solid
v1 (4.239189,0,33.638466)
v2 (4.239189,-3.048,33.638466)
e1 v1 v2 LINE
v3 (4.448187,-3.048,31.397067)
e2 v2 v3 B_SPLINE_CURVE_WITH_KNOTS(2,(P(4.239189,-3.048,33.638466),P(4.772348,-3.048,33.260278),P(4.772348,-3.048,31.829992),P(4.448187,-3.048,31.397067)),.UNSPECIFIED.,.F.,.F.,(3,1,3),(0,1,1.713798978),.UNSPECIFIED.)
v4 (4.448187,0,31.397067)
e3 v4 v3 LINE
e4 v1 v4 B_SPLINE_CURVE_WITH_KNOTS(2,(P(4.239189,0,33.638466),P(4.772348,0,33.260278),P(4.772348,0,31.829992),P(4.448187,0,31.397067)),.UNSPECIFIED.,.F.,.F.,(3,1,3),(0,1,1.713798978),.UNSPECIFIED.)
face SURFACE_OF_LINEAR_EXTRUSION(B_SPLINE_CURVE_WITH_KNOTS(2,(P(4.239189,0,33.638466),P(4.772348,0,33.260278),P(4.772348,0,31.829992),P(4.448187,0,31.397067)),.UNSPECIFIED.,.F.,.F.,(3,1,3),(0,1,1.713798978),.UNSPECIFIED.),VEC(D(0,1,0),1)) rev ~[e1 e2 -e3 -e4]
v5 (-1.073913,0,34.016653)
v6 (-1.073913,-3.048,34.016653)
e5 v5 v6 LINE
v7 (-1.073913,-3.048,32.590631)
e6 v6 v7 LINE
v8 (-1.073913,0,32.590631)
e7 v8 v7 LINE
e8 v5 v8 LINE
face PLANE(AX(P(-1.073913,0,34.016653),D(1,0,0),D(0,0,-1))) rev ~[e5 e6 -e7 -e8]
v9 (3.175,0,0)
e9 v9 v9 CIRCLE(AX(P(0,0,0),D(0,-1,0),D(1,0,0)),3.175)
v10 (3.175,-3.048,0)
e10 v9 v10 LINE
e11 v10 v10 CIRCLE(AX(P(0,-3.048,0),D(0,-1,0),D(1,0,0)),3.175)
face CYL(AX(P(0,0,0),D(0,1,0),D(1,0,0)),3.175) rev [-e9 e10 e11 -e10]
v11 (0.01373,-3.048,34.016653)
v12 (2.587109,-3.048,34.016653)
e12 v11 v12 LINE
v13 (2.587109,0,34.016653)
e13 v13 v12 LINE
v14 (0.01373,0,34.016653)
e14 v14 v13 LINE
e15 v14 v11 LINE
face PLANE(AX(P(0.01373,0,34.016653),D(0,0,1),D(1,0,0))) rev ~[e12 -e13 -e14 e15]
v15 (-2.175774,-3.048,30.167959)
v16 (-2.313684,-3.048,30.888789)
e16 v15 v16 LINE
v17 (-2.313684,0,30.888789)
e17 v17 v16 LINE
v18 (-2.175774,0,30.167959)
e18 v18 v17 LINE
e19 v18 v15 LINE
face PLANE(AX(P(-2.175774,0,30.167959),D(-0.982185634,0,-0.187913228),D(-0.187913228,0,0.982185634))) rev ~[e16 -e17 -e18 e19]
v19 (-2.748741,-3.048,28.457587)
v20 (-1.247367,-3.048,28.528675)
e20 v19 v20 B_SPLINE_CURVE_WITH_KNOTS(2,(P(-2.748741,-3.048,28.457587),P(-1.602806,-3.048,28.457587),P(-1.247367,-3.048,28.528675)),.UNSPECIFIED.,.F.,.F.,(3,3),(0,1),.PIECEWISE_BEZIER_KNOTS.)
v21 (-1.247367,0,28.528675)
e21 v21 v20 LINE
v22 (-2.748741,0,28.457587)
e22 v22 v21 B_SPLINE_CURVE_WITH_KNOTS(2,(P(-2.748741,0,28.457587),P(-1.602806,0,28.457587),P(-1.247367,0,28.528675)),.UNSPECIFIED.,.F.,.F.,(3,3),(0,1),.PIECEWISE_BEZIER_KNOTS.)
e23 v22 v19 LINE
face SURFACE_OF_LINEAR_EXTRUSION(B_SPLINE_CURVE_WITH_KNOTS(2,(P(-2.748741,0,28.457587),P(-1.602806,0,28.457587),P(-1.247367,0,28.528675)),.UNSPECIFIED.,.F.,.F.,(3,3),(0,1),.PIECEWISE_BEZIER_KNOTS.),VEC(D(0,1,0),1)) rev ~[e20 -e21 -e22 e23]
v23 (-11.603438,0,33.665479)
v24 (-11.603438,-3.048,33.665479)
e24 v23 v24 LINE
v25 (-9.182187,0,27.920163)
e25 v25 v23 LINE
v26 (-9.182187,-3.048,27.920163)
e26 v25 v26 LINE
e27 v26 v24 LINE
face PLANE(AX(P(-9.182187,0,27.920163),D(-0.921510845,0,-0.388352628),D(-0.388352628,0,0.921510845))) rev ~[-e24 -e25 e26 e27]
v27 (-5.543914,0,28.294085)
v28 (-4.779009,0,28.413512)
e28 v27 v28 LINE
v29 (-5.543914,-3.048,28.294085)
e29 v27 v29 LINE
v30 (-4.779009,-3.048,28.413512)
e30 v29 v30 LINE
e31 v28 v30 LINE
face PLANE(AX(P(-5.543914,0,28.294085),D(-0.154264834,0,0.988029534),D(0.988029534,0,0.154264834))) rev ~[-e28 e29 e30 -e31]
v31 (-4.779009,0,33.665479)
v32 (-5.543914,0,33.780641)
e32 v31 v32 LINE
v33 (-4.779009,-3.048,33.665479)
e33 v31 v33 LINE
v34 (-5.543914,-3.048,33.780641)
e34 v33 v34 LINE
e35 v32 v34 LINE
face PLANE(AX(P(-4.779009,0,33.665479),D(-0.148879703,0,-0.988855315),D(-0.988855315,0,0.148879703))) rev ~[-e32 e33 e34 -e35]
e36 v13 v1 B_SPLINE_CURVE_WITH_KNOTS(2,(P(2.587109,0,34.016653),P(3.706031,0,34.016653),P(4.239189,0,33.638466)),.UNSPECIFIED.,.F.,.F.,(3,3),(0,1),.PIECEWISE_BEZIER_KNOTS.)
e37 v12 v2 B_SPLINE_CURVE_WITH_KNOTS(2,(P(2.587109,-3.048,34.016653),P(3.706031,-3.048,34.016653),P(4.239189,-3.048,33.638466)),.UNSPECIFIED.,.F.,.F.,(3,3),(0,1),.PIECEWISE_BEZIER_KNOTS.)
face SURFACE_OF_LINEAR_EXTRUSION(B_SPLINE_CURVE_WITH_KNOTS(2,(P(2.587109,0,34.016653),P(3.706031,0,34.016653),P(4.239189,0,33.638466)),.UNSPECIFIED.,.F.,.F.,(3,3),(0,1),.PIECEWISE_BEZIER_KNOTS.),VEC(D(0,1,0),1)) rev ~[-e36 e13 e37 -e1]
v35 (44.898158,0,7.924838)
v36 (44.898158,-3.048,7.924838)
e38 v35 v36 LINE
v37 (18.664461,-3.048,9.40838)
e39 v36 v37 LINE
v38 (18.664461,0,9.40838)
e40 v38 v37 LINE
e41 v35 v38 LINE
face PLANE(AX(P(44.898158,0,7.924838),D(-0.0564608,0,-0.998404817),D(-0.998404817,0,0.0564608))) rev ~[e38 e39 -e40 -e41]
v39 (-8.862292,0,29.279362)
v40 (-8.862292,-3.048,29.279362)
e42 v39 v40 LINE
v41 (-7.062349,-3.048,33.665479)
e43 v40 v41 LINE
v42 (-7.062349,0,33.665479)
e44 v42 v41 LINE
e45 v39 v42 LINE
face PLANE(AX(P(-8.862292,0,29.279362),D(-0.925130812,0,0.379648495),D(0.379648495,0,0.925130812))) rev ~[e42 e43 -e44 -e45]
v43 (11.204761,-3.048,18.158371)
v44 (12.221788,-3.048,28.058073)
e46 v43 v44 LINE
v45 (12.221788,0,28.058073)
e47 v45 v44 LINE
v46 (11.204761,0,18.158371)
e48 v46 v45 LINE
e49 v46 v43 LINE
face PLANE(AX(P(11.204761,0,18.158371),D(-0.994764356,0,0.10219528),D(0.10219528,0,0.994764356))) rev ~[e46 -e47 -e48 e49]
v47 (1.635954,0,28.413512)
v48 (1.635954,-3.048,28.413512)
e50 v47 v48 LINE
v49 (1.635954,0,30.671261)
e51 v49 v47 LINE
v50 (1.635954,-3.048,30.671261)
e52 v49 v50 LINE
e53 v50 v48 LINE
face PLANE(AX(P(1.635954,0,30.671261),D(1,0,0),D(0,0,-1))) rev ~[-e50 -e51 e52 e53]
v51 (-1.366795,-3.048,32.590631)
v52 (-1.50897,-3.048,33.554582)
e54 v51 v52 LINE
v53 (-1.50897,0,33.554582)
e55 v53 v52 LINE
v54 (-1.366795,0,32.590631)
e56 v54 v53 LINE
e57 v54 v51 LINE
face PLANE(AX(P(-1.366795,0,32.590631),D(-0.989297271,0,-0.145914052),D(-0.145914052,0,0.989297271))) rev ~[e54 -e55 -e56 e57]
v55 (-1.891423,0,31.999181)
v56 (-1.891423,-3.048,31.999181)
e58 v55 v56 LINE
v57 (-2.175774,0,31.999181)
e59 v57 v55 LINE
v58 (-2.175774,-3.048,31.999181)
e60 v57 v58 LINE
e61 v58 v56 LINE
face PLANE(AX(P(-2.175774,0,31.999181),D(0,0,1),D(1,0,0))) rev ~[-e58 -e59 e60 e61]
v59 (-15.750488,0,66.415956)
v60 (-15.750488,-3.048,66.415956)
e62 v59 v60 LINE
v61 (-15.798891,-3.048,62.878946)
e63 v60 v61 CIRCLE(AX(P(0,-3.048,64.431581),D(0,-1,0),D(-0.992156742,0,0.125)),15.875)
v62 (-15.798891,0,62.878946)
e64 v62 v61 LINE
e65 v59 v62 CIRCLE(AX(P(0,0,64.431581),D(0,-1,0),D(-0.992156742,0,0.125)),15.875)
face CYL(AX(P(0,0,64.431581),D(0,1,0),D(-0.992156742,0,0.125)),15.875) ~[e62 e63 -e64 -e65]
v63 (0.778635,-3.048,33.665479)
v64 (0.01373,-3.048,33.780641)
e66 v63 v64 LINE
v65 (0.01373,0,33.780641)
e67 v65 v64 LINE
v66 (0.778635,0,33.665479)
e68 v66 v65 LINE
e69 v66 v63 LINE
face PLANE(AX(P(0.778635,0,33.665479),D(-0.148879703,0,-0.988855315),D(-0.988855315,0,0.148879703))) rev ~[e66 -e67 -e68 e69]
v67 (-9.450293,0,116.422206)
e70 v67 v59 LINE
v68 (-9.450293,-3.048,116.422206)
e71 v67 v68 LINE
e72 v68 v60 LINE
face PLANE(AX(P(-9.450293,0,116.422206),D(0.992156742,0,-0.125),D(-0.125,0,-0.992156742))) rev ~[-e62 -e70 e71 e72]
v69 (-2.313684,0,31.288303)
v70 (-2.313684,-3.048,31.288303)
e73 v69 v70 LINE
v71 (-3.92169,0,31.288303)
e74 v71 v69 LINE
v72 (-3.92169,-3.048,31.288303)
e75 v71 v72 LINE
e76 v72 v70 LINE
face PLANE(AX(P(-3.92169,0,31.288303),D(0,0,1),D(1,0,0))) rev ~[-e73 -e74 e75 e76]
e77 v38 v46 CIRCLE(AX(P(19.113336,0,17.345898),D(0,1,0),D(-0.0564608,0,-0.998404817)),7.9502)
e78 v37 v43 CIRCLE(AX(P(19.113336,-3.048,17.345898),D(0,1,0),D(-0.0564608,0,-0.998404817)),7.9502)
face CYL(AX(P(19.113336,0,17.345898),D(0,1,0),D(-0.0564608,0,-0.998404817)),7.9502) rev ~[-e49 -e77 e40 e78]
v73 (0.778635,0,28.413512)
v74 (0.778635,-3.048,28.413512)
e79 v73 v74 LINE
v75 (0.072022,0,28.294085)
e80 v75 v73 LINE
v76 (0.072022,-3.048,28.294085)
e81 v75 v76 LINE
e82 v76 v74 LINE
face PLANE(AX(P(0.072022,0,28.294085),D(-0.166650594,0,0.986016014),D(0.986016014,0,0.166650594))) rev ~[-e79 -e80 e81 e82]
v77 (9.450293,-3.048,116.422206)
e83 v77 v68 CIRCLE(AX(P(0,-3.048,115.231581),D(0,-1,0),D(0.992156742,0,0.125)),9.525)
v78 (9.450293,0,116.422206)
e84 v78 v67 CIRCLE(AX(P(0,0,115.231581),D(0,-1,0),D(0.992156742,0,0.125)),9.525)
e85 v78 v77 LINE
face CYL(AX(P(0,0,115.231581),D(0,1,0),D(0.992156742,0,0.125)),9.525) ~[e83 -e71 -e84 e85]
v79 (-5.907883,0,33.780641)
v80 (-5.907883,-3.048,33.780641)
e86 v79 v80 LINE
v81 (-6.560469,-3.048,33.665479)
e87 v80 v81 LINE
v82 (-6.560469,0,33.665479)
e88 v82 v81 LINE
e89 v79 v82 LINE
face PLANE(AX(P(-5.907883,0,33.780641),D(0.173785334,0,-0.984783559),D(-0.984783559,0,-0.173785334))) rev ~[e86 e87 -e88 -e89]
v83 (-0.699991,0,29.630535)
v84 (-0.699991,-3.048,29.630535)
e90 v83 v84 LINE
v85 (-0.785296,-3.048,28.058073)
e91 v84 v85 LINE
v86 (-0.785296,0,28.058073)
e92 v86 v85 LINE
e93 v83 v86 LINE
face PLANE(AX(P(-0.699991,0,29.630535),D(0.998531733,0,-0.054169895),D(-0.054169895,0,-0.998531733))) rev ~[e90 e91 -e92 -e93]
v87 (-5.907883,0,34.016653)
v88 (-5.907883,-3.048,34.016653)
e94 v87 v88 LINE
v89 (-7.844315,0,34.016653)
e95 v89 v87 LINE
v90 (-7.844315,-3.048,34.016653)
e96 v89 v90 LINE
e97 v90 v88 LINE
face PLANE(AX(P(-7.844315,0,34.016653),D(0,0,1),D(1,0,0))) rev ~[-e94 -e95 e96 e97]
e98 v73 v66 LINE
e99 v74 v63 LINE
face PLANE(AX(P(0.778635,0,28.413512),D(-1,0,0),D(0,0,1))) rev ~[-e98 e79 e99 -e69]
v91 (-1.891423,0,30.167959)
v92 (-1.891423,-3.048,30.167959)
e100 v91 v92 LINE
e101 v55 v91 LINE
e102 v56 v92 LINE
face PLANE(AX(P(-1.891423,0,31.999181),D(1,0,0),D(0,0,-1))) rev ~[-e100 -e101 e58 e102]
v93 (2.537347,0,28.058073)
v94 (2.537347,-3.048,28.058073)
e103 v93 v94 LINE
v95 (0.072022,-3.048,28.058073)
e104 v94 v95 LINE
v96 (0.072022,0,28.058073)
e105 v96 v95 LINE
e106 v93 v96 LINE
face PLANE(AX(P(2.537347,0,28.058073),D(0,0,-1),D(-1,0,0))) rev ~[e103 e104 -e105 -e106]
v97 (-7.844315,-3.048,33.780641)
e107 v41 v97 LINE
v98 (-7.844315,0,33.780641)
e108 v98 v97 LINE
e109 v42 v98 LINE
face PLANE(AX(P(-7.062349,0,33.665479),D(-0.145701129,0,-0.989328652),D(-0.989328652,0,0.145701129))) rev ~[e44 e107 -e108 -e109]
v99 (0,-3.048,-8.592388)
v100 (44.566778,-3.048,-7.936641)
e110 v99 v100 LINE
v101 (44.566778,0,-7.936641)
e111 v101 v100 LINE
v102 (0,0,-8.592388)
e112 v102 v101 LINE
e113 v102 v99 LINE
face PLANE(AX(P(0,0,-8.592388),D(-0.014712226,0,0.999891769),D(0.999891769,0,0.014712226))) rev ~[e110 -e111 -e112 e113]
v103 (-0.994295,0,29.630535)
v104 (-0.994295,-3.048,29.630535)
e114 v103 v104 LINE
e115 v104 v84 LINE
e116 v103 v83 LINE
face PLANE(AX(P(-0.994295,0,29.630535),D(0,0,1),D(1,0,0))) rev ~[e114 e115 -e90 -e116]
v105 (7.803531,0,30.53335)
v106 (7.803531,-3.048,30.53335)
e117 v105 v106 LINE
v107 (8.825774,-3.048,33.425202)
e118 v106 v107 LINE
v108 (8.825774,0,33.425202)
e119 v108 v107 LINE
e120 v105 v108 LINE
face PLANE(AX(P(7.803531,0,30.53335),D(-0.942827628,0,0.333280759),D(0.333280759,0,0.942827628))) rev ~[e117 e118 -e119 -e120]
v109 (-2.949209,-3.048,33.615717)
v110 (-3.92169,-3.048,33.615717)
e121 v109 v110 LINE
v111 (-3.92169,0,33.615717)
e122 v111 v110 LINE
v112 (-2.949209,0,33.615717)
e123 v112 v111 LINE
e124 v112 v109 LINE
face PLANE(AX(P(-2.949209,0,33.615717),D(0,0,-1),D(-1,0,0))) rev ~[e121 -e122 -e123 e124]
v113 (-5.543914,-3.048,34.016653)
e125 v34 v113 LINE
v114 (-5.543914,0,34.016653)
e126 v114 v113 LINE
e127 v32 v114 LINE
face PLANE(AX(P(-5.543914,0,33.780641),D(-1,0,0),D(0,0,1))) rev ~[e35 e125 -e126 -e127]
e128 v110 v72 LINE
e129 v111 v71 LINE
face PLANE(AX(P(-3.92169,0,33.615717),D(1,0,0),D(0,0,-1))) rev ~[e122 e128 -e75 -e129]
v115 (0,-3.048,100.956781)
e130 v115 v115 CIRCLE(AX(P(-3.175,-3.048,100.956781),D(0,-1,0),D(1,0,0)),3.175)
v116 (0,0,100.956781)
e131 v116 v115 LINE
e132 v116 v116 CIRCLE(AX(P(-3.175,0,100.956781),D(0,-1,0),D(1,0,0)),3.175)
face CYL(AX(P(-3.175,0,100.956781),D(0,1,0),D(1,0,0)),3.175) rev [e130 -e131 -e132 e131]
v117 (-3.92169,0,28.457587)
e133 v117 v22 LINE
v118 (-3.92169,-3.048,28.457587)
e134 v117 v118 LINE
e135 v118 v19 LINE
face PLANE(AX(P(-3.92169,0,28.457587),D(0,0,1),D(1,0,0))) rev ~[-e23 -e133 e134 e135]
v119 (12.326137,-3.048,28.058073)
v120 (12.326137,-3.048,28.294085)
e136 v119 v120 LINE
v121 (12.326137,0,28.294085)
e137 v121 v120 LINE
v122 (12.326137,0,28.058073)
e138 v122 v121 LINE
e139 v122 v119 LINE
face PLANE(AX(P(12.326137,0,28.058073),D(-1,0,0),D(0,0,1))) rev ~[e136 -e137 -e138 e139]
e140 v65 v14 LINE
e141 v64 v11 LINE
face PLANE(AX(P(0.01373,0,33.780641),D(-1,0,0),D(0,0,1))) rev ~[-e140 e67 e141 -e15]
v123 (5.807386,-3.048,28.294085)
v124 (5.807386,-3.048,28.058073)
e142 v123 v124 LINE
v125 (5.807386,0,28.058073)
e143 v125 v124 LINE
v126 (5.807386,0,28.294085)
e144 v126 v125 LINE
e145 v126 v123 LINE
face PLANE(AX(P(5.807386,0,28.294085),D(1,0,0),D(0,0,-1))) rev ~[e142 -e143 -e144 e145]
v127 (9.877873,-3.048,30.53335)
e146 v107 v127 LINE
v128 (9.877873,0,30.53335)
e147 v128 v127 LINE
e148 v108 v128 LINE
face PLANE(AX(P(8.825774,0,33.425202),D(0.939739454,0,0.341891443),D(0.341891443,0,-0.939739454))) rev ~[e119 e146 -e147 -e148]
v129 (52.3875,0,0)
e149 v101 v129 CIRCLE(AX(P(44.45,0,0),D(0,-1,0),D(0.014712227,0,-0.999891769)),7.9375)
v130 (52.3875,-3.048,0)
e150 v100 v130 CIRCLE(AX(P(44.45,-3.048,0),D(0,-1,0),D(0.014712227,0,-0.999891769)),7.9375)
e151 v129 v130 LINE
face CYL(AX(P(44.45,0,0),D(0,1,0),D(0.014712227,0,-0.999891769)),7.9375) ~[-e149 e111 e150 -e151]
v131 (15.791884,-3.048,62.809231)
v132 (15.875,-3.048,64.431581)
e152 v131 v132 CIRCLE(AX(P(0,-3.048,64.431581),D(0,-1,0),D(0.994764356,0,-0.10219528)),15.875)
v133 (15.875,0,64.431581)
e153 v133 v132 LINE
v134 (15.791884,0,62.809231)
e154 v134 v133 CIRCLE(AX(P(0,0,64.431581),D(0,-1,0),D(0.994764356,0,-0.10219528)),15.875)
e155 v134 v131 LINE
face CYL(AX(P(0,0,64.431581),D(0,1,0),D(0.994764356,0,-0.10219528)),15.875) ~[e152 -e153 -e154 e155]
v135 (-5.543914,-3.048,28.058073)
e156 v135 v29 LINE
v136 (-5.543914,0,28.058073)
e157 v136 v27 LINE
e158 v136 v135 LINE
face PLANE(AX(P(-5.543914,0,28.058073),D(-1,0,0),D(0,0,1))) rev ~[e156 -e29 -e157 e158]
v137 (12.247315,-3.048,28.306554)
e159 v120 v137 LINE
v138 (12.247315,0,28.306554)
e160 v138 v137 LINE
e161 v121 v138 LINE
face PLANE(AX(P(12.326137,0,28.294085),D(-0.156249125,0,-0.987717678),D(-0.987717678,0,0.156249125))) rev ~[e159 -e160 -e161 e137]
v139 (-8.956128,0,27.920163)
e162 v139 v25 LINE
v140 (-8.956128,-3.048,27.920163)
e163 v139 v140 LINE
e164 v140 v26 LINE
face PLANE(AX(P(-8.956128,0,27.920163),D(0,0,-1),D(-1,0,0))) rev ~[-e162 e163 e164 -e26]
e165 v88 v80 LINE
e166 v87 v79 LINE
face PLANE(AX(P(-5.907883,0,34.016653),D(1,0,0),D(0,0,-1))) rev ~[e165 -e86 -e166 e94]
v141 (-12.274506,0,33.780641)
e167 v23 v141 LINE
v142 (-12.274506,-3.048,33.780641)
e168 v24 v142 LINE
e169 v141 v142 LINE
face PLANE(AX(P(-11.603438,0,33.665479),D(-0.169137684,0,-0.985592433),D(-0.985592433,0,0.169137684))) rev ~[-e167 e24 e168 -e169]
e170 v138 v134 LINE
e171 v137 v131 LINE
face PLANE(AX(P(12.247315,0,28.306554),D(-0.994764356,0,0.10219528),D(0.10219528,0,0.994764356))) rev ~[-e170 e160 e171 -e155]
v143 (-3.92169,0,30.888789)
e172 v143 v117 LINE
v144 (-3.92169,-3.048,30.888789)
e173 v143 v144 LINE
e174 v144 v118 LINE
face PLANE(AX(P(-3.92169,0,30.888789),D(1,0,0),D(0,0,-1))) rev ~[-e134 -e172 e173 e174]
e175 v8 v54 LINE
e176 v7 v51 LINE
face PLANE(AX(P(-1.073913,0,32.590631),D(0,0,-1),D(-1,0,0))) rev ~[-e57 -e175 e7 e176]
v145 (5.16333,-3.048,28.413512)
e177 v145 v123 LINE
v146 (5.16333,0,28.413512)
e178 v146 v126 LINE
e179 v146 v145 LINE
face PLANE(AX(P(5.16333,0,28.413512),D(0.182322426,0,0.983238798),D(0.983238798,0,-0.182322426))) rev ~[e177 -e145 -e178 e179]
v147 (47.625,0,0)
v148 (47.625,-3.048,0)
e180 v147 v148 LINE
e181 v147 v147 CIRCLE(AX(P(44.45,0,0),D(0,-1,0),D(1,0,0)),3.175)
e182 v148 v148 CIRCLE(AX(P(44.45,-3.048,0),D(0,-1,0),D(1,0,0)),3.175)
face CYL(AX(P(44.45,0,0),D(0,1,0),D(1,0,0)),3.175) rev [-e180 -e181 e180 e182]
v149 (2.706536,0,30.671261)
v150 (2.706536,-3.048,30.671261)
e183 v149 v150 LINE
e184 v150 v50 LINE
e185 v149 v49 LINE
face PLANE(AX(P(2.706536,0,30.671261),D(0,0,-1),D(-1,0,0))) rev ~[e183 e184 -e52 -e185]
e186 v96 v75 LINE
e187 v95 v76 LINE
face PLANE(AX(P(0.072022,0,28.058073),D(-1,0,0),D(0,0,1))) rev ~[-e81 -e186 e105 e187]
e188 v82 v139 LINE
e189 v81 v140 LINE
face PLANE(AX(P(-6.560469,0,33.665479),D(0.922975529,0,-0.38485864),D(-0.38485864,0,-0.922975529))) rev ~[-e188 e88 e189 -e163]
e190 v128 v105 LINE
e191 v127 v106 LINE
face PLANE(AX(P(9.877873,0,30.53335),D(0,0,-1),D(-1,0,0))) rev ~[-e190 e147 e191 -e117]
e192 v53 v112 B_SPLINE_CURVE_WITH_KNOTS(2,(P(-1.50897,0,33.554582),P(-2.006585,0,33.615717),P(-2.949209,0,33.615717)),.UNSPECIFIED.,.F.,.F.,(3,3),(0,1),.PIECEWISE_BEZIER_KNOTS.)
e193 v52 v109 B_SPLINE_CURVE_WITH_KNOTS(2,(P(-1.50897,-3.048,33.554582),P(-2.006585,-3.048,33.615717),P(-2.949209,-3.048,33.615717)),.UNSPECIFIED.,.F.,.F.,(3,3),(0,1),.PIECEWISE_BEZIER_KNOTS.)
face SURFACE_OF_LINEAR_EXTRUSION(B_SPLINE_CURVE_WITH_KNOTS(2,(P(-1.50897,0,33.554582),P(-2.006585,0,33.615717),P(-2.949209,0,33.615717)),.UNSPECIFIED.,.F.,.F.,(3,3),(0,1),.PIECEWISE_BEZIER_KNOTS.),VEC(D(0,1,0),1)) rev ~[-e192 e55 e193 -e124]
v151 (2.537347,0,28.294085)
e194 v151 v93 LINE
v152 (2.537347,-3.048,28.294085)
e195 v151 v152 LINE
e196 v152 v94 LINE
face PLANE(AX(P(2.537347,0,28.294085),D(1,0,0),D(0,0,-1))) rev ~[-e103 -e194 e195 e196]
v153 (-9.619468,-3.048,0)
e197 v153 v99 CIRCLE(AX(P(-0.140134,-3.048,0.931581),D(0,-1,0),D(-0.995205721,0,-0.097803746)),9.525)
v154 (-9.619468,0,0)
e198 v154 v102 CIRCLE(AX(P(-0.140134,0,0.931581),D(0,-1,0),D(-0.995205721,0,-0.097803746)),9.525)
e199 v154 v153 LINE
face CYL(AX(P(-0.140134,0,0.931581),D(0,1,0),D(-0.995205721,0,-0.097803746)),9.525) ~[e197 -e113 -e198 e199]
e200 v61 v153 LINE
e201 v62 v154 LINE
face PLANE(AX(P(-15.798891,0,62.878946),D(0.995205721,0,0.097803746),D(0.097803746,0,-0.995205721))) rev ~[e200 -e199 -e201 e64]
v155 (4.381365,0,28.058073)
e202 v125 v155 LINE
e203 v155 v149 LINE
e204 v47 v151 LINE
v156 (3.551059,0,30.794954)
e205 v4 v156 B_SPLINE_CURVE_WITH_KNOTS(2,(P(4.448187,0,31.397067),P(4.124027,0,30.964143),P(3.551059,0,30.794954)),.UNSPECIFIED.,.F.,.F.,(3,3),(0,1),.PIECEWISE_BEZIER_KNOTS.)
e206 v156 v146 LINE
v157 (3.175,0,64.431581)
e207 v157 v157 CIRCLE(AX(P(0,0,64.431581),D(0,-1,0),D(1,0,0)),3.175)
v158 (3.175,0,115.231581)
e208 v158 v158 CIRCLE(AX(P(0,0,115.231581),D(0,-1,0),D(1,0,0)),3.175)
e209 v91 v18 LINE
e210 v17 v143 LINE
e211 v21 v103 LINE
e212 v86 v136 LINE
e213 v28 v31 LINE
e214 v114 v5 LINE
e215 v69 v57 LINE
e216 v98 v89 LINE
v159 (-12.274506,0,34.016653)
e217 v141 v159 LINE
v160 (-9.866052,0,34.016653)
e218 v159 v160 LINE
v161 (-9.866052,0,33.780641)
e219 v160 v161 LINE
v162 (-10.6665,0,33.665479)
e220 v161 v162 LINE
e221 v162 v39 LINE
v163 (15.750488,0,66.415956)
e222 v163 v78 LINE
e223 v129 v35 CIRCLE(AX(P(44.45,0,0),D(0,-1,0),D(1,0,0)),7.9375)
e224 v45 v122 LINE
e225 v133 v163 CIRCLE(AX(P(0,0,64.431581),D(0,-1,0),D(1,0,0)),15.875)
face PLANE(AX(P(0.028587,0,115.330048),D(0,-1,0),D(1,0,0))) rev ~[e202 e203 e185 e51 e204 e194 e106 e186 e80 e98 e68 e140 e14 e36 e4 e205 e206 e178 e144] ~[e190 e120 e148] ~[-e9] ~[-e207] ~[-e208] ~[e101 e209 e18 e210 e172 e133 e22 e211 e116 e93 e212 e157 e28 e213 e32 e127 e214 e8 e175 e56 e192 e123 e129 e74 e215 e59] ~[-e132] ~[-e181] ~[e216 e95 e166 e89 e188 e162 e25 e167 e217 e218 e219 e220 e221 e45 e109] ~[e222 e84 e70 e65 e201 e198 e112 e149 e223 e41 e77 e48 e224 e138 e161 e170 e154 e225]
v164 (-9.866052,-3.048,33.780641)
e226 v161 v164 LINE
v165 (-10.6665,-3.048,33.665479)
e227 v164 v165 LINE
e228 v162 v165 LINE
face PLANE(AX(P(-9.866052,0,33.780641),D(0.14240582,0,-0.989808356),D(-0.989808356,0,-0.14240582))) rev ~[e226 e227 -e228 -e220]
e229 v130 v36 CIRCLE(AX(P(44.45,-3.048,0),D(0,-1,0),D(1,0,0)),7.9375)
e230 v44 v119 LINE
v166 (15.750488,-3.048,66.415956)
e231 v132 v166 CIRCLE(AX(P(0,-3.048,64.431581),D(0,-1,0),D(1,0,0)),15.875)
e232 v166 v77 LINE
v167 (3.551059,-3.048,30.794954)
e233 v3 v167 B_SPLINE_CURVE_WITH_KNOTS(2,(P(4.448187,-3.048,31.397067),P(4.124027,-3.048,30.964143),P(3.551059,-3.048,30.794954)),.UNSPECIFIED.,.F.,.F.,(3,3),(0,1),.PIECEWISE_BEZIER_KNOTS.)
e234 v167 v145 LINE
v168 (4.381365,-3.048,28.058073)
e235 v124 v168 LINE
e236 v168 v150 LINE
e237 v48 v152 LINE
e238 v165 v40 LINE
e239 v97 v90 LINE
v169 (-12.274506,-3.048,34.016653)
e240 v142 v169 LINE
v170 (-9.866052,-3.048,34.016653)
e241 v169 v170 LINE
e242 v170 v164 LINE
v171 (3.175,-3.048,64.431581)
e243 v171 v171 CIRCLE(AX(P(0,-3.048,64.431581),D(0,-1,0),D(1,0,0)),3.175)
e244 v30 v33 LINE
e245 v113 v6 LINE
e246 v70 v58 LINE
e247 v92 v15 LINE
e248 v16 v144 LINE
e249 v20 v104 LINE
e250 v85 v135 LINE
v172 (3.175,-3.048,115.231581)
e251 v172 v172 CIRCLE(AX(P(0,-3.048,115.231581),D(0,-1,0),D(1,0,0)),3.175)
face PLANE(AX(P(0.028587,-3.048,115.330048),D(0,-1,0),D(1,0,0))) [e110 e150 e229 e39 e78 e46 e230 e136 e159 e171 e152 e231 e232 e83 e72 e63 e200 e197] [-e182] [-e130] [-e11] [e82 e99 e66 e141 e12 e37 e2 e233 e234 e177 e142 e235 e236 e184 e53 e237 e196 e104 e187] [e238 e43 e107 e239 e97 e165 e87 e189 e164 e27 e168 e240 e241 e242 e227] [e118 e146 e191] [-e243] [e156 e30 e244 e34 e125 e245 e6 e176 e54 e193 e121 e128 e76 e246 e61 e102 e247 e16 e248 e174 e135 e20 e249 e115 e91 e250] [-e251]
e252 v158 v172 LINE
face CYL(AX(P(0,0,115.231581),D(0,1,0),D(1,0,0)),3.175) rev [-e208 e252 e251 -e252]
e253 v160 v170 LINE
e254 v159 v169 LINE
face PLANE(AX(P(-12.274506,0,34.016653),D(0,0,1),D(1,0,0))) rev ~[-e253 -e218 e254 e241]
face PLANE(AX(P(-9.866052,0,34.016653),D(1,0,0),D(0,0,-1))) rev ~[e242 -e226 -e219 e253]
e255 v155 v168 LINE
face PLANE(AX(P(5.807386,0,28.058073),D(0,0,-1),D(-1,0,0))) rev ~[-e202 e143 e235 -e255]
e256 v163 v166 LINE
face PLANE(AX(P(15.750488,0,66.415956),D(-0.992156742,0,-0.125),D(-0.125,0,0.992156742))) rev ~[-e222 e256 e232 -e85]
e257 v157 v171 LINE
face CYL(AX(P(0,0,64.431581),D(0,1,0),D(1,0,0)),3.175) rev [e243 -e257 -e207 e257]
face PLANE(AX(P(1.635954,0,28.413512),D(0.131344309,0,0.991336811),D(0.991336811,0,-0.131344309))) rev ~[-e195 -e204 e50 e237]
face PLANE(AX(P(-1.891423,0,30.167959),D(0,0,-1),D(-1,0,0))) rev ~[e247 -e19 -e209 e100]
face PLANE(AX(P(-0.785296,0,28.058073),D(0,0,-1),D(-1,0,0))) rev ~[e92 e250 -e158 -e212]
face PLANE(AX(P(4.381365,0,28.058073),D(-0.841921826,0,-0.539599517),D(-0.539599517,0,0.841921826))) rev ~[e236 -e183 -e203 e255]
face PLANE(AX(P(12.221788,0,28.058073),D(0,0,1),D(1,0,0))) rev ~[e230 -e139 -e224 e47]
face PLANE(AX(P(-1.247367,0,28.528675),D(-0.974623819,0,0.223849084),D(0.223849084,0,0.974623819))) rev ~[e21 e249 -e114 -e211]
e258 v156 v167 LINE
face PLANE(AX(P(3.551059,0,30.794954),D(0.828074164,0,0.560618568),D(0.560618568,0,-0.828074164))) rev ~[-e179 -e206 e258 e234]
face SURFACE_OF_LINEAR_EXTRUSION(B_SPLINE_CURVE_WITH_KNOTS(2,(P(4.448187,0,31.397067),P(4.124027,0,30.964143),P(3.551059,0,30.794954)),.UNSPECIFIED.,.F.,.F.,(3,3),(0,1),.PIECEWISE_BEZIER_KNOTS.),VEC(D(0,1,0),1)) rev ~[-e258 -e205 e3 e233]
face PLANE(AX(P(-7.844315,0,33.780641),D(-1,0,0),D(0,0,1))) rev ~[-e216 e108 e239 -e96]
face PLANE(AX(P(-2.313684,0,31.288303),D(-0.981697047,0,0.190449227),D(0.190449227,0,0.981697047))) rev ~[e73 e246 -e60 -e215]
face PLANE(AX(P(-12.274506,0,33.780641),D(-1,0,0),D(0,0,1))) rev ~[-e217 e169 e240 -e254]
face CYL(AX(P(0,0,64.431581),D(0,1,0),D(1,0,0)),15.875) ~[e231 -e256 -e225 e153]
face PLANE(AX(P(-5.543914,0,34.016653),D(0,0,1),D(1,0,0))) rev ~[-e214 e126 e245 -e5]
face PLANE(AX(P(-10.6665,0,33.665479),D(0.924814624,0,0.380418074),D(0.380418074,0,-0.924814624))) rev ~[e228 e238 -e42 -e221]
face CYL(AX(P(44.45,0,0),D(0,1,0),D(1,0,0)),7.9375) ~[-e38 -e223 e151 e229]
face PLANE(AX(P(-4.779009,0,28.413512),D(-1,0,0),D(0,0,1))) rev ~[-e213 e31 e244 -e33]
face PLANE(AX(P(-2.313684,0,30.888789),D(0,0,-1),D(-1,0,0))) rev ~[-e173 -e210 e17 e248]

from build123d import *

# Parameters (mm, degrees)
F0_R     = 3.175
F1_DEPTH = 3.048


with BuildPart() as f1:
    # F0 (on Front) → F1 (new body)
    with BuildSketch(Plane.XZ):
        with BuildLine():
            ThreePointArc((-9.4502929642, 116.4222056828), (-0.596483242, 105.7252757886), (9.525, 115.2315806828))
            ThreePointArc((9.525, 115.2315806828), (9.5063048942, 115.8280639248), (9.4502929642, 116.4222056828))
            ThreePointArc((9.4502929642, 116.4222056828), (0, 124.7565806828), (-9.4502929642, 116.4222056828))
        make_face()
        with Locations((0, 115.2315806828)):
            Circle(F0_R, mode=Mode.SUBTRACT)
        with BuildLine():
            ThreePointArc((9.4502929642, 116.4222056828), (9.5063048942, 115.8280639248), (9.525, 115.2315806828))
            ThreePointArc((9.525, 115.2315806828), (-0.596483242, 105.7252757886), (-9.4502929642, 116.4222056828))
            Line((-9.4502929642, 116.4222056828), (-15.7504882737, 66.4159556828))
            ThreePointArc((-15.7504882737, 66.4159556828), (0, 80.3065806828), (15.7504882737, 66.4159556828))
            Line((15.7504882737, 66.4159556828), (9.4502929642, 116.4222056828))
        make_face()
        with Locations((-3.175, 100.9567806828)):
            Circle(F0_R, mode=Mode.SUBTRACT)
        with BuildLine():
            ThreePointArc((15.875, 64.4315806828), (15.8438414904, 65.4257194194), (15.7504882737, 66.4159556828))
            ThreePointArc((15.7504882737, 66.4159556828), (0, 80.3065806828), (-15.7504882737, 66.4159556828))
            ThreePointArc((-15.7504882737, 66.4159556828), (-15.8735137675, 64.6488033167), (-15.7988908218, 62.8789462115))
            ThreePointArc((-15.7988908218, 62.8789462115), (-0.0350334036, 48.5566193392), (15.7918841581, 62.8092306167))
            ThreePointArc((15.7918841581, 62.8092306167), (15.8542074228, 63.6193418048), (15.875, 64.4315806828))
        make_face()
        with Locations((0, 64.4315806828)):
            Circle(F0_R, mode=Mode.SUBTRACT)
        with BuildLine():
            ThreePointArc((15.7918841581, 62.8092306167), (-0.0350334036, 48.5566193392), (-15.7988908218, 62.8789462115))
            Line((-15.7988908218, 62.8789462115), (-9.6194684488, 0))
            ThreePointArc((-9.6194684488, 0), (-0.6064835851, 10.4451574562), (9.3848660442, 0.9315806828))
            ThreePointArc((9.3848660442, 0.9315806828), (6.6444220698, -5.7538829911), (0, -8.5923884202))
            Line((0, -8.5923884202), (44.566778303, -7.9366409191))
            ThreePointArc((44.566778303, -7.9366409191), (36.5142317093, 0.1657947093), (44.898157601, 7.9248382327))
            Line((44.898157601, 7.9248382327), (18.664461469, 9.408380228))
            ThreePointArc((18.664461469, 9.408380228), (13.0633502744, 12.1880545359), (11.2047605357, 18.158371115))
            Line((11.2047605357, 18.158371115), (12.2217881669, 28.0580733262))
            Line((12.2217881669, 28.0580733262), (9.806785479, 28.0580733262))
            Line((9.806785479, 28.0580733262), (9.806785479, 28.294084817))
            Line((9.806785479, 28.294084817), (10.6072340892, 28.4135123184))
            Line((10.6072340892, 28.4135123184), (10.0157836063, 30.1324152843))
            Line((10.0157836063, 30.1324152843), (7.6698862582, 30.1324152843))
            Line((7.6698862582, 30.1324152843), (7.0699052395, 28.4135123184))
            Line((7.0699052395, 28.4135123184), (7.8703538498, 28.294084817))
            Line((7.8703538498, 28.294084817), (7.8703538498, 28.0580733262))
            Line((7.8703538498, 28.0580733262), (5.9111741252, 28.0580733262))
            Line((5.9111741252, 28.0580733262), (5.9111741252, 28.294084817))
            Line((5.9111741252, 28.294084817), (6.5865082102, 28.4135123184))
            Line((6.5865082102, 28.4135123184), (8.6167757333, 34.0649922933))
            Line((8.6167757333, 34.0649922933), (9.4598770226, 34.0649922933))
            Line((9.4598770226, 34.0649922933), (11.5711846359, 28.4135123184))
            Line((11.5711846359, 28.4135123184), (12.2473153484, 28.3065537876))
            Line((12.2473153484, 28.3065537876), (15.7918841581, 62.8092306167))
        make_face()
        Polygon((-7.8443148705, 34.0166525904), (-5.9078832413, 34.0166525904), (-5.9078832413, 33.7806410996), (-6.5604692309, 33.6654788662), (-8.9561280379, 27.9201629973), (-9.1821872369, 27.9201629973), (-11.6034376513, 33.6654788662), (-12.2745064684, 33.7806410996), (-12.2745064684, 34.0166525904), (-9.8660518577, 34.0166525904), (-9.8660518577, 33.7806410996), (-10.666500468, 33.6654788662), (-8.862292144, 29.2793617032), (-7.0623490878, 33.6654788662), (-7.8443148705, 33.7806410996), align=None, mode=Mode.SUBTRACT)
        with BuildLine():
            Line((-5.5439137134, 28.0580733262), (-5.5439137134, 28.294084817))
            Line((-5.5439137134, 28.294084817), (-4.7790090023, 28.4135123184))
            Line((-4.7790090023, 28.4135123184), (-4.7790090023, 33.6654788662))
            Line((-4.7790090023, 33.6654788662), (-5.5439137134, 33.7806410996))
            Line((-5.5439137134, 33.7806410996), (-5.5439137134, 34.0166525904))
            Line((-5.5439137134, 34.0166525904), (-1.0739129483, 34.0166525904))
            Line((-1.0739129483, 34.0166525904), (-1.0739129483, 32.5906313539))
            Line((-1.0739129483, 32.5906313539), (-1.3667946778, 32.5906313539))
            Line((-1.3667946778, 32.5906313539), (-1.5089702747, 33.5545819006))
            add(Edge.make_bspline(
                [(-1.5089702747, 33.5545819006), (-2.0065848637, 33.6157174073), (-2.9492090708, 33.6157174073)],
                knots=[0, 0, 0, 1, 1, 1], degree=2))
            Line((-2.9492090708, 33.6157174073), (-3.9216901533, 33.6157174073))
            Line((-3.9216901533, 33.6157174073), (-3.9216901533, 31.2883028868))
            Line((-3.9216901533, 31.2883028868), (-2.3136841529, 31.2883028868))
            Line((-2.3136841529, 31.2883028868), (-2.1757738239, 31.999180871))
            Line((-2.1757738239, 31.999180871), (-1.8914226302, 31.999180871))
            Line((-1.8914226302, 31.999180871), (-1.8914226302, 30.1679591835))
            Line((-1.8914226302, 30.1679591835), (-2.1757738239, 30.1679591835))
            Line((-2.1757738239, 30.1679591835), (-2.3136841529, 30.8887894596))
            Line((-2.3136841529, 30.8887894596), (-3.9216901533, 30.8887894596))
            Line((-3.9216901533, 30.8887894596), (-3.9216901533, 28.4575867534))
            Line((-3.9216901533, 28.4575867534), (-2.7487414792, 28.4575867534))
            add(Edge.make_bspline(
                [(-2.7487414792, 28.4575867534), (-1.6028061686, 28.4575867534), (-1.2473671765, 28.5286745518)],
                knots=[0, 0, 0, 1, 1, 1], degree=2))
            Line((-1.2473671765, 28.5286745518), (-0.9942946141, 29.6305354274))
            Line((-0.9942946141, 29.6305354274), (-0.6999911286, 29.6305354274))
            Line((-0.6999911286, 29.6305354274), (-0.7852964867, 28.0580733262))
            Line((-0.7852964867, 28.0580733262), (-5.5439137134, 28.0580733262))
        make_face(mode=Mode.SUBTRACT)
        with BuildLine():
            Line((2.7065361721, 30.6712607964), (1.6359539277, 30.6712607964))
            Line((1.6359539277, 30.6712607964), (1.6359539277, 28.4135123184))
            Line((1.6359539277, 28.4135123184), (2.5373472118, 28.294084817))
            Line((2.5373472118, 28.294084817), (2.5373472118, 28.0580733262))
            Line((2.5373472118, 28.0580733262), (0.0720223624, 28.0580733262))
            Line((0.0720223624, 28.0580733262), (0.0720223624, 28.294084817))
            Line((0.0720223624, 28.294084817), (0.7786350787, 28.4135123184))
            Line((0.7786350787, 28.4135123184), (0.7786350787, 33.6654788662))
            Line((0.7786350787, 33.6654788662), (0.0137303676, 33.7806410996))
            Line((0.0137303676, 33.7806410996), (0.0137303676, 34.0166525904))
            Line((0.0137303676, 34.0166525904), (2.5871086707, 34.0166525904))
            add(Edge.make_bspline(
                [(2.5871086707, 34.0166525904), (3.7060306179, 34.0166525904), (4.2391891061, 33.6384655028)],
                knots=[0, 0, 0, 1, 1, 1], degree=2))
            add(Edge.make_bspline(
                [(4.2391891061, 33.6384655028), (4.7723475943, 33.2602784151), (4.7723475943, 32.4257076616)],
                knots=[0, 0, 0, 1, 1, 1], degree=2))
            add(Edge.make_bspline(
                [(4.7723475943, 32.4257076616), (4.7723475943, 31.8299919108), (4.4481872335, 31.3970672184)],
                knots=[0, 0, 0, 1, 1, 1], degree=2))
            add(Edge.make_bspline(
                [(4.4481872335, 31.3970672184), (4.1240268727, 30.9641425259), (3.5510592174, 30.7949535657)],
                knots=[0, 0, 0, 1, 1, 1], degree=2))
            Line((3.5510592174, 30.7949535657), (5.1633304857, 28.4135123184))
            Line((5.1633304857, 28.4135123184), (5.8073859394, 28.294084817))
            Line((5.8073859394, 28.294084817), (5.8073859394, 28.0580733262))
            Line((5.8073859394, 28.0580733262), (4.381364703, 28.0580733262))
            Line((4.381364703, 28.0580733262), (2.7065361721, 30.6712607964))
        make_face(mode=Mode.SUBTRACT)
        with BuildLine():
            ThreePointArc((9.3848660442, 0.9315806828), (-0.6064835851, 10.4451574562), (-9.6194684488, 0))
            ThreePointArc((-9.6194684488, 0), (-6.4854039547, -6.1721629528), (0, -8.5923884202))
            ThreePointArc((0, -8.5923884202), (6.6444220698, -5.7538829911), (9.3848660442, 0.9315806828))
        make_face()
        Circle(F0_R, mode=Mode.SUBTRACT)
        Polygon((12.3261370552, 28.294084817), (12.2473153484, 28.3065537876), (12.2217881669, 28.0580733262), (12.3261370552, 28.0580733262), align=None)
        Polygon((12.2217881669, 28.0580733262), (12.2473153484, 28.3065537876), (11.5711846359, 28.4135123184), (9.4598770226, 34.0649922933), (8.6167757333, 34.0649922933), (6.5865082102, 28.4135123184), (5.9111741252, 28.294084817), (5.9111741252, 28.0580733262), (7.8703538498, 28.0580733262), (7.8703538498, 28.294084817), (7.0699052395, 28.4135123184), (7.6698862582, 30.1324152843), (10.0157836063, 30.1324152843), (10.6072340892, 28.4135123184), (9.806785479, 28.294084817), (9.806785479, 28.0580733262), align=None)
        Polygon((7.8035313193, 30.5333504675), (8.8257738607, 33.4252021075), (9.8778732774, 30.5333504675), align=None, mode=Mode.SUBTRACT)
        with BuildLine():
            ThreePointArc((44.898157601, 7.9248382327), (36.5142317093, 0.1657947093), (44.566778303, -7.9366409191))
            ThreePointArc((44.566778303, -7.9366409191), (50.1037966903, -5.571219726), (52.3875, 0))
            ThreePointArc((52.3875, 0), (50.2189321892, 5.4519104584), (44.898157601, 7.9248382327))
        make_face()
        with Locations((44.45, 0)):
            Circle(F0_R, mode=Mode.SUBTRACT)
    extrude(amount=F1_DEPTH)


solid = f1.part
